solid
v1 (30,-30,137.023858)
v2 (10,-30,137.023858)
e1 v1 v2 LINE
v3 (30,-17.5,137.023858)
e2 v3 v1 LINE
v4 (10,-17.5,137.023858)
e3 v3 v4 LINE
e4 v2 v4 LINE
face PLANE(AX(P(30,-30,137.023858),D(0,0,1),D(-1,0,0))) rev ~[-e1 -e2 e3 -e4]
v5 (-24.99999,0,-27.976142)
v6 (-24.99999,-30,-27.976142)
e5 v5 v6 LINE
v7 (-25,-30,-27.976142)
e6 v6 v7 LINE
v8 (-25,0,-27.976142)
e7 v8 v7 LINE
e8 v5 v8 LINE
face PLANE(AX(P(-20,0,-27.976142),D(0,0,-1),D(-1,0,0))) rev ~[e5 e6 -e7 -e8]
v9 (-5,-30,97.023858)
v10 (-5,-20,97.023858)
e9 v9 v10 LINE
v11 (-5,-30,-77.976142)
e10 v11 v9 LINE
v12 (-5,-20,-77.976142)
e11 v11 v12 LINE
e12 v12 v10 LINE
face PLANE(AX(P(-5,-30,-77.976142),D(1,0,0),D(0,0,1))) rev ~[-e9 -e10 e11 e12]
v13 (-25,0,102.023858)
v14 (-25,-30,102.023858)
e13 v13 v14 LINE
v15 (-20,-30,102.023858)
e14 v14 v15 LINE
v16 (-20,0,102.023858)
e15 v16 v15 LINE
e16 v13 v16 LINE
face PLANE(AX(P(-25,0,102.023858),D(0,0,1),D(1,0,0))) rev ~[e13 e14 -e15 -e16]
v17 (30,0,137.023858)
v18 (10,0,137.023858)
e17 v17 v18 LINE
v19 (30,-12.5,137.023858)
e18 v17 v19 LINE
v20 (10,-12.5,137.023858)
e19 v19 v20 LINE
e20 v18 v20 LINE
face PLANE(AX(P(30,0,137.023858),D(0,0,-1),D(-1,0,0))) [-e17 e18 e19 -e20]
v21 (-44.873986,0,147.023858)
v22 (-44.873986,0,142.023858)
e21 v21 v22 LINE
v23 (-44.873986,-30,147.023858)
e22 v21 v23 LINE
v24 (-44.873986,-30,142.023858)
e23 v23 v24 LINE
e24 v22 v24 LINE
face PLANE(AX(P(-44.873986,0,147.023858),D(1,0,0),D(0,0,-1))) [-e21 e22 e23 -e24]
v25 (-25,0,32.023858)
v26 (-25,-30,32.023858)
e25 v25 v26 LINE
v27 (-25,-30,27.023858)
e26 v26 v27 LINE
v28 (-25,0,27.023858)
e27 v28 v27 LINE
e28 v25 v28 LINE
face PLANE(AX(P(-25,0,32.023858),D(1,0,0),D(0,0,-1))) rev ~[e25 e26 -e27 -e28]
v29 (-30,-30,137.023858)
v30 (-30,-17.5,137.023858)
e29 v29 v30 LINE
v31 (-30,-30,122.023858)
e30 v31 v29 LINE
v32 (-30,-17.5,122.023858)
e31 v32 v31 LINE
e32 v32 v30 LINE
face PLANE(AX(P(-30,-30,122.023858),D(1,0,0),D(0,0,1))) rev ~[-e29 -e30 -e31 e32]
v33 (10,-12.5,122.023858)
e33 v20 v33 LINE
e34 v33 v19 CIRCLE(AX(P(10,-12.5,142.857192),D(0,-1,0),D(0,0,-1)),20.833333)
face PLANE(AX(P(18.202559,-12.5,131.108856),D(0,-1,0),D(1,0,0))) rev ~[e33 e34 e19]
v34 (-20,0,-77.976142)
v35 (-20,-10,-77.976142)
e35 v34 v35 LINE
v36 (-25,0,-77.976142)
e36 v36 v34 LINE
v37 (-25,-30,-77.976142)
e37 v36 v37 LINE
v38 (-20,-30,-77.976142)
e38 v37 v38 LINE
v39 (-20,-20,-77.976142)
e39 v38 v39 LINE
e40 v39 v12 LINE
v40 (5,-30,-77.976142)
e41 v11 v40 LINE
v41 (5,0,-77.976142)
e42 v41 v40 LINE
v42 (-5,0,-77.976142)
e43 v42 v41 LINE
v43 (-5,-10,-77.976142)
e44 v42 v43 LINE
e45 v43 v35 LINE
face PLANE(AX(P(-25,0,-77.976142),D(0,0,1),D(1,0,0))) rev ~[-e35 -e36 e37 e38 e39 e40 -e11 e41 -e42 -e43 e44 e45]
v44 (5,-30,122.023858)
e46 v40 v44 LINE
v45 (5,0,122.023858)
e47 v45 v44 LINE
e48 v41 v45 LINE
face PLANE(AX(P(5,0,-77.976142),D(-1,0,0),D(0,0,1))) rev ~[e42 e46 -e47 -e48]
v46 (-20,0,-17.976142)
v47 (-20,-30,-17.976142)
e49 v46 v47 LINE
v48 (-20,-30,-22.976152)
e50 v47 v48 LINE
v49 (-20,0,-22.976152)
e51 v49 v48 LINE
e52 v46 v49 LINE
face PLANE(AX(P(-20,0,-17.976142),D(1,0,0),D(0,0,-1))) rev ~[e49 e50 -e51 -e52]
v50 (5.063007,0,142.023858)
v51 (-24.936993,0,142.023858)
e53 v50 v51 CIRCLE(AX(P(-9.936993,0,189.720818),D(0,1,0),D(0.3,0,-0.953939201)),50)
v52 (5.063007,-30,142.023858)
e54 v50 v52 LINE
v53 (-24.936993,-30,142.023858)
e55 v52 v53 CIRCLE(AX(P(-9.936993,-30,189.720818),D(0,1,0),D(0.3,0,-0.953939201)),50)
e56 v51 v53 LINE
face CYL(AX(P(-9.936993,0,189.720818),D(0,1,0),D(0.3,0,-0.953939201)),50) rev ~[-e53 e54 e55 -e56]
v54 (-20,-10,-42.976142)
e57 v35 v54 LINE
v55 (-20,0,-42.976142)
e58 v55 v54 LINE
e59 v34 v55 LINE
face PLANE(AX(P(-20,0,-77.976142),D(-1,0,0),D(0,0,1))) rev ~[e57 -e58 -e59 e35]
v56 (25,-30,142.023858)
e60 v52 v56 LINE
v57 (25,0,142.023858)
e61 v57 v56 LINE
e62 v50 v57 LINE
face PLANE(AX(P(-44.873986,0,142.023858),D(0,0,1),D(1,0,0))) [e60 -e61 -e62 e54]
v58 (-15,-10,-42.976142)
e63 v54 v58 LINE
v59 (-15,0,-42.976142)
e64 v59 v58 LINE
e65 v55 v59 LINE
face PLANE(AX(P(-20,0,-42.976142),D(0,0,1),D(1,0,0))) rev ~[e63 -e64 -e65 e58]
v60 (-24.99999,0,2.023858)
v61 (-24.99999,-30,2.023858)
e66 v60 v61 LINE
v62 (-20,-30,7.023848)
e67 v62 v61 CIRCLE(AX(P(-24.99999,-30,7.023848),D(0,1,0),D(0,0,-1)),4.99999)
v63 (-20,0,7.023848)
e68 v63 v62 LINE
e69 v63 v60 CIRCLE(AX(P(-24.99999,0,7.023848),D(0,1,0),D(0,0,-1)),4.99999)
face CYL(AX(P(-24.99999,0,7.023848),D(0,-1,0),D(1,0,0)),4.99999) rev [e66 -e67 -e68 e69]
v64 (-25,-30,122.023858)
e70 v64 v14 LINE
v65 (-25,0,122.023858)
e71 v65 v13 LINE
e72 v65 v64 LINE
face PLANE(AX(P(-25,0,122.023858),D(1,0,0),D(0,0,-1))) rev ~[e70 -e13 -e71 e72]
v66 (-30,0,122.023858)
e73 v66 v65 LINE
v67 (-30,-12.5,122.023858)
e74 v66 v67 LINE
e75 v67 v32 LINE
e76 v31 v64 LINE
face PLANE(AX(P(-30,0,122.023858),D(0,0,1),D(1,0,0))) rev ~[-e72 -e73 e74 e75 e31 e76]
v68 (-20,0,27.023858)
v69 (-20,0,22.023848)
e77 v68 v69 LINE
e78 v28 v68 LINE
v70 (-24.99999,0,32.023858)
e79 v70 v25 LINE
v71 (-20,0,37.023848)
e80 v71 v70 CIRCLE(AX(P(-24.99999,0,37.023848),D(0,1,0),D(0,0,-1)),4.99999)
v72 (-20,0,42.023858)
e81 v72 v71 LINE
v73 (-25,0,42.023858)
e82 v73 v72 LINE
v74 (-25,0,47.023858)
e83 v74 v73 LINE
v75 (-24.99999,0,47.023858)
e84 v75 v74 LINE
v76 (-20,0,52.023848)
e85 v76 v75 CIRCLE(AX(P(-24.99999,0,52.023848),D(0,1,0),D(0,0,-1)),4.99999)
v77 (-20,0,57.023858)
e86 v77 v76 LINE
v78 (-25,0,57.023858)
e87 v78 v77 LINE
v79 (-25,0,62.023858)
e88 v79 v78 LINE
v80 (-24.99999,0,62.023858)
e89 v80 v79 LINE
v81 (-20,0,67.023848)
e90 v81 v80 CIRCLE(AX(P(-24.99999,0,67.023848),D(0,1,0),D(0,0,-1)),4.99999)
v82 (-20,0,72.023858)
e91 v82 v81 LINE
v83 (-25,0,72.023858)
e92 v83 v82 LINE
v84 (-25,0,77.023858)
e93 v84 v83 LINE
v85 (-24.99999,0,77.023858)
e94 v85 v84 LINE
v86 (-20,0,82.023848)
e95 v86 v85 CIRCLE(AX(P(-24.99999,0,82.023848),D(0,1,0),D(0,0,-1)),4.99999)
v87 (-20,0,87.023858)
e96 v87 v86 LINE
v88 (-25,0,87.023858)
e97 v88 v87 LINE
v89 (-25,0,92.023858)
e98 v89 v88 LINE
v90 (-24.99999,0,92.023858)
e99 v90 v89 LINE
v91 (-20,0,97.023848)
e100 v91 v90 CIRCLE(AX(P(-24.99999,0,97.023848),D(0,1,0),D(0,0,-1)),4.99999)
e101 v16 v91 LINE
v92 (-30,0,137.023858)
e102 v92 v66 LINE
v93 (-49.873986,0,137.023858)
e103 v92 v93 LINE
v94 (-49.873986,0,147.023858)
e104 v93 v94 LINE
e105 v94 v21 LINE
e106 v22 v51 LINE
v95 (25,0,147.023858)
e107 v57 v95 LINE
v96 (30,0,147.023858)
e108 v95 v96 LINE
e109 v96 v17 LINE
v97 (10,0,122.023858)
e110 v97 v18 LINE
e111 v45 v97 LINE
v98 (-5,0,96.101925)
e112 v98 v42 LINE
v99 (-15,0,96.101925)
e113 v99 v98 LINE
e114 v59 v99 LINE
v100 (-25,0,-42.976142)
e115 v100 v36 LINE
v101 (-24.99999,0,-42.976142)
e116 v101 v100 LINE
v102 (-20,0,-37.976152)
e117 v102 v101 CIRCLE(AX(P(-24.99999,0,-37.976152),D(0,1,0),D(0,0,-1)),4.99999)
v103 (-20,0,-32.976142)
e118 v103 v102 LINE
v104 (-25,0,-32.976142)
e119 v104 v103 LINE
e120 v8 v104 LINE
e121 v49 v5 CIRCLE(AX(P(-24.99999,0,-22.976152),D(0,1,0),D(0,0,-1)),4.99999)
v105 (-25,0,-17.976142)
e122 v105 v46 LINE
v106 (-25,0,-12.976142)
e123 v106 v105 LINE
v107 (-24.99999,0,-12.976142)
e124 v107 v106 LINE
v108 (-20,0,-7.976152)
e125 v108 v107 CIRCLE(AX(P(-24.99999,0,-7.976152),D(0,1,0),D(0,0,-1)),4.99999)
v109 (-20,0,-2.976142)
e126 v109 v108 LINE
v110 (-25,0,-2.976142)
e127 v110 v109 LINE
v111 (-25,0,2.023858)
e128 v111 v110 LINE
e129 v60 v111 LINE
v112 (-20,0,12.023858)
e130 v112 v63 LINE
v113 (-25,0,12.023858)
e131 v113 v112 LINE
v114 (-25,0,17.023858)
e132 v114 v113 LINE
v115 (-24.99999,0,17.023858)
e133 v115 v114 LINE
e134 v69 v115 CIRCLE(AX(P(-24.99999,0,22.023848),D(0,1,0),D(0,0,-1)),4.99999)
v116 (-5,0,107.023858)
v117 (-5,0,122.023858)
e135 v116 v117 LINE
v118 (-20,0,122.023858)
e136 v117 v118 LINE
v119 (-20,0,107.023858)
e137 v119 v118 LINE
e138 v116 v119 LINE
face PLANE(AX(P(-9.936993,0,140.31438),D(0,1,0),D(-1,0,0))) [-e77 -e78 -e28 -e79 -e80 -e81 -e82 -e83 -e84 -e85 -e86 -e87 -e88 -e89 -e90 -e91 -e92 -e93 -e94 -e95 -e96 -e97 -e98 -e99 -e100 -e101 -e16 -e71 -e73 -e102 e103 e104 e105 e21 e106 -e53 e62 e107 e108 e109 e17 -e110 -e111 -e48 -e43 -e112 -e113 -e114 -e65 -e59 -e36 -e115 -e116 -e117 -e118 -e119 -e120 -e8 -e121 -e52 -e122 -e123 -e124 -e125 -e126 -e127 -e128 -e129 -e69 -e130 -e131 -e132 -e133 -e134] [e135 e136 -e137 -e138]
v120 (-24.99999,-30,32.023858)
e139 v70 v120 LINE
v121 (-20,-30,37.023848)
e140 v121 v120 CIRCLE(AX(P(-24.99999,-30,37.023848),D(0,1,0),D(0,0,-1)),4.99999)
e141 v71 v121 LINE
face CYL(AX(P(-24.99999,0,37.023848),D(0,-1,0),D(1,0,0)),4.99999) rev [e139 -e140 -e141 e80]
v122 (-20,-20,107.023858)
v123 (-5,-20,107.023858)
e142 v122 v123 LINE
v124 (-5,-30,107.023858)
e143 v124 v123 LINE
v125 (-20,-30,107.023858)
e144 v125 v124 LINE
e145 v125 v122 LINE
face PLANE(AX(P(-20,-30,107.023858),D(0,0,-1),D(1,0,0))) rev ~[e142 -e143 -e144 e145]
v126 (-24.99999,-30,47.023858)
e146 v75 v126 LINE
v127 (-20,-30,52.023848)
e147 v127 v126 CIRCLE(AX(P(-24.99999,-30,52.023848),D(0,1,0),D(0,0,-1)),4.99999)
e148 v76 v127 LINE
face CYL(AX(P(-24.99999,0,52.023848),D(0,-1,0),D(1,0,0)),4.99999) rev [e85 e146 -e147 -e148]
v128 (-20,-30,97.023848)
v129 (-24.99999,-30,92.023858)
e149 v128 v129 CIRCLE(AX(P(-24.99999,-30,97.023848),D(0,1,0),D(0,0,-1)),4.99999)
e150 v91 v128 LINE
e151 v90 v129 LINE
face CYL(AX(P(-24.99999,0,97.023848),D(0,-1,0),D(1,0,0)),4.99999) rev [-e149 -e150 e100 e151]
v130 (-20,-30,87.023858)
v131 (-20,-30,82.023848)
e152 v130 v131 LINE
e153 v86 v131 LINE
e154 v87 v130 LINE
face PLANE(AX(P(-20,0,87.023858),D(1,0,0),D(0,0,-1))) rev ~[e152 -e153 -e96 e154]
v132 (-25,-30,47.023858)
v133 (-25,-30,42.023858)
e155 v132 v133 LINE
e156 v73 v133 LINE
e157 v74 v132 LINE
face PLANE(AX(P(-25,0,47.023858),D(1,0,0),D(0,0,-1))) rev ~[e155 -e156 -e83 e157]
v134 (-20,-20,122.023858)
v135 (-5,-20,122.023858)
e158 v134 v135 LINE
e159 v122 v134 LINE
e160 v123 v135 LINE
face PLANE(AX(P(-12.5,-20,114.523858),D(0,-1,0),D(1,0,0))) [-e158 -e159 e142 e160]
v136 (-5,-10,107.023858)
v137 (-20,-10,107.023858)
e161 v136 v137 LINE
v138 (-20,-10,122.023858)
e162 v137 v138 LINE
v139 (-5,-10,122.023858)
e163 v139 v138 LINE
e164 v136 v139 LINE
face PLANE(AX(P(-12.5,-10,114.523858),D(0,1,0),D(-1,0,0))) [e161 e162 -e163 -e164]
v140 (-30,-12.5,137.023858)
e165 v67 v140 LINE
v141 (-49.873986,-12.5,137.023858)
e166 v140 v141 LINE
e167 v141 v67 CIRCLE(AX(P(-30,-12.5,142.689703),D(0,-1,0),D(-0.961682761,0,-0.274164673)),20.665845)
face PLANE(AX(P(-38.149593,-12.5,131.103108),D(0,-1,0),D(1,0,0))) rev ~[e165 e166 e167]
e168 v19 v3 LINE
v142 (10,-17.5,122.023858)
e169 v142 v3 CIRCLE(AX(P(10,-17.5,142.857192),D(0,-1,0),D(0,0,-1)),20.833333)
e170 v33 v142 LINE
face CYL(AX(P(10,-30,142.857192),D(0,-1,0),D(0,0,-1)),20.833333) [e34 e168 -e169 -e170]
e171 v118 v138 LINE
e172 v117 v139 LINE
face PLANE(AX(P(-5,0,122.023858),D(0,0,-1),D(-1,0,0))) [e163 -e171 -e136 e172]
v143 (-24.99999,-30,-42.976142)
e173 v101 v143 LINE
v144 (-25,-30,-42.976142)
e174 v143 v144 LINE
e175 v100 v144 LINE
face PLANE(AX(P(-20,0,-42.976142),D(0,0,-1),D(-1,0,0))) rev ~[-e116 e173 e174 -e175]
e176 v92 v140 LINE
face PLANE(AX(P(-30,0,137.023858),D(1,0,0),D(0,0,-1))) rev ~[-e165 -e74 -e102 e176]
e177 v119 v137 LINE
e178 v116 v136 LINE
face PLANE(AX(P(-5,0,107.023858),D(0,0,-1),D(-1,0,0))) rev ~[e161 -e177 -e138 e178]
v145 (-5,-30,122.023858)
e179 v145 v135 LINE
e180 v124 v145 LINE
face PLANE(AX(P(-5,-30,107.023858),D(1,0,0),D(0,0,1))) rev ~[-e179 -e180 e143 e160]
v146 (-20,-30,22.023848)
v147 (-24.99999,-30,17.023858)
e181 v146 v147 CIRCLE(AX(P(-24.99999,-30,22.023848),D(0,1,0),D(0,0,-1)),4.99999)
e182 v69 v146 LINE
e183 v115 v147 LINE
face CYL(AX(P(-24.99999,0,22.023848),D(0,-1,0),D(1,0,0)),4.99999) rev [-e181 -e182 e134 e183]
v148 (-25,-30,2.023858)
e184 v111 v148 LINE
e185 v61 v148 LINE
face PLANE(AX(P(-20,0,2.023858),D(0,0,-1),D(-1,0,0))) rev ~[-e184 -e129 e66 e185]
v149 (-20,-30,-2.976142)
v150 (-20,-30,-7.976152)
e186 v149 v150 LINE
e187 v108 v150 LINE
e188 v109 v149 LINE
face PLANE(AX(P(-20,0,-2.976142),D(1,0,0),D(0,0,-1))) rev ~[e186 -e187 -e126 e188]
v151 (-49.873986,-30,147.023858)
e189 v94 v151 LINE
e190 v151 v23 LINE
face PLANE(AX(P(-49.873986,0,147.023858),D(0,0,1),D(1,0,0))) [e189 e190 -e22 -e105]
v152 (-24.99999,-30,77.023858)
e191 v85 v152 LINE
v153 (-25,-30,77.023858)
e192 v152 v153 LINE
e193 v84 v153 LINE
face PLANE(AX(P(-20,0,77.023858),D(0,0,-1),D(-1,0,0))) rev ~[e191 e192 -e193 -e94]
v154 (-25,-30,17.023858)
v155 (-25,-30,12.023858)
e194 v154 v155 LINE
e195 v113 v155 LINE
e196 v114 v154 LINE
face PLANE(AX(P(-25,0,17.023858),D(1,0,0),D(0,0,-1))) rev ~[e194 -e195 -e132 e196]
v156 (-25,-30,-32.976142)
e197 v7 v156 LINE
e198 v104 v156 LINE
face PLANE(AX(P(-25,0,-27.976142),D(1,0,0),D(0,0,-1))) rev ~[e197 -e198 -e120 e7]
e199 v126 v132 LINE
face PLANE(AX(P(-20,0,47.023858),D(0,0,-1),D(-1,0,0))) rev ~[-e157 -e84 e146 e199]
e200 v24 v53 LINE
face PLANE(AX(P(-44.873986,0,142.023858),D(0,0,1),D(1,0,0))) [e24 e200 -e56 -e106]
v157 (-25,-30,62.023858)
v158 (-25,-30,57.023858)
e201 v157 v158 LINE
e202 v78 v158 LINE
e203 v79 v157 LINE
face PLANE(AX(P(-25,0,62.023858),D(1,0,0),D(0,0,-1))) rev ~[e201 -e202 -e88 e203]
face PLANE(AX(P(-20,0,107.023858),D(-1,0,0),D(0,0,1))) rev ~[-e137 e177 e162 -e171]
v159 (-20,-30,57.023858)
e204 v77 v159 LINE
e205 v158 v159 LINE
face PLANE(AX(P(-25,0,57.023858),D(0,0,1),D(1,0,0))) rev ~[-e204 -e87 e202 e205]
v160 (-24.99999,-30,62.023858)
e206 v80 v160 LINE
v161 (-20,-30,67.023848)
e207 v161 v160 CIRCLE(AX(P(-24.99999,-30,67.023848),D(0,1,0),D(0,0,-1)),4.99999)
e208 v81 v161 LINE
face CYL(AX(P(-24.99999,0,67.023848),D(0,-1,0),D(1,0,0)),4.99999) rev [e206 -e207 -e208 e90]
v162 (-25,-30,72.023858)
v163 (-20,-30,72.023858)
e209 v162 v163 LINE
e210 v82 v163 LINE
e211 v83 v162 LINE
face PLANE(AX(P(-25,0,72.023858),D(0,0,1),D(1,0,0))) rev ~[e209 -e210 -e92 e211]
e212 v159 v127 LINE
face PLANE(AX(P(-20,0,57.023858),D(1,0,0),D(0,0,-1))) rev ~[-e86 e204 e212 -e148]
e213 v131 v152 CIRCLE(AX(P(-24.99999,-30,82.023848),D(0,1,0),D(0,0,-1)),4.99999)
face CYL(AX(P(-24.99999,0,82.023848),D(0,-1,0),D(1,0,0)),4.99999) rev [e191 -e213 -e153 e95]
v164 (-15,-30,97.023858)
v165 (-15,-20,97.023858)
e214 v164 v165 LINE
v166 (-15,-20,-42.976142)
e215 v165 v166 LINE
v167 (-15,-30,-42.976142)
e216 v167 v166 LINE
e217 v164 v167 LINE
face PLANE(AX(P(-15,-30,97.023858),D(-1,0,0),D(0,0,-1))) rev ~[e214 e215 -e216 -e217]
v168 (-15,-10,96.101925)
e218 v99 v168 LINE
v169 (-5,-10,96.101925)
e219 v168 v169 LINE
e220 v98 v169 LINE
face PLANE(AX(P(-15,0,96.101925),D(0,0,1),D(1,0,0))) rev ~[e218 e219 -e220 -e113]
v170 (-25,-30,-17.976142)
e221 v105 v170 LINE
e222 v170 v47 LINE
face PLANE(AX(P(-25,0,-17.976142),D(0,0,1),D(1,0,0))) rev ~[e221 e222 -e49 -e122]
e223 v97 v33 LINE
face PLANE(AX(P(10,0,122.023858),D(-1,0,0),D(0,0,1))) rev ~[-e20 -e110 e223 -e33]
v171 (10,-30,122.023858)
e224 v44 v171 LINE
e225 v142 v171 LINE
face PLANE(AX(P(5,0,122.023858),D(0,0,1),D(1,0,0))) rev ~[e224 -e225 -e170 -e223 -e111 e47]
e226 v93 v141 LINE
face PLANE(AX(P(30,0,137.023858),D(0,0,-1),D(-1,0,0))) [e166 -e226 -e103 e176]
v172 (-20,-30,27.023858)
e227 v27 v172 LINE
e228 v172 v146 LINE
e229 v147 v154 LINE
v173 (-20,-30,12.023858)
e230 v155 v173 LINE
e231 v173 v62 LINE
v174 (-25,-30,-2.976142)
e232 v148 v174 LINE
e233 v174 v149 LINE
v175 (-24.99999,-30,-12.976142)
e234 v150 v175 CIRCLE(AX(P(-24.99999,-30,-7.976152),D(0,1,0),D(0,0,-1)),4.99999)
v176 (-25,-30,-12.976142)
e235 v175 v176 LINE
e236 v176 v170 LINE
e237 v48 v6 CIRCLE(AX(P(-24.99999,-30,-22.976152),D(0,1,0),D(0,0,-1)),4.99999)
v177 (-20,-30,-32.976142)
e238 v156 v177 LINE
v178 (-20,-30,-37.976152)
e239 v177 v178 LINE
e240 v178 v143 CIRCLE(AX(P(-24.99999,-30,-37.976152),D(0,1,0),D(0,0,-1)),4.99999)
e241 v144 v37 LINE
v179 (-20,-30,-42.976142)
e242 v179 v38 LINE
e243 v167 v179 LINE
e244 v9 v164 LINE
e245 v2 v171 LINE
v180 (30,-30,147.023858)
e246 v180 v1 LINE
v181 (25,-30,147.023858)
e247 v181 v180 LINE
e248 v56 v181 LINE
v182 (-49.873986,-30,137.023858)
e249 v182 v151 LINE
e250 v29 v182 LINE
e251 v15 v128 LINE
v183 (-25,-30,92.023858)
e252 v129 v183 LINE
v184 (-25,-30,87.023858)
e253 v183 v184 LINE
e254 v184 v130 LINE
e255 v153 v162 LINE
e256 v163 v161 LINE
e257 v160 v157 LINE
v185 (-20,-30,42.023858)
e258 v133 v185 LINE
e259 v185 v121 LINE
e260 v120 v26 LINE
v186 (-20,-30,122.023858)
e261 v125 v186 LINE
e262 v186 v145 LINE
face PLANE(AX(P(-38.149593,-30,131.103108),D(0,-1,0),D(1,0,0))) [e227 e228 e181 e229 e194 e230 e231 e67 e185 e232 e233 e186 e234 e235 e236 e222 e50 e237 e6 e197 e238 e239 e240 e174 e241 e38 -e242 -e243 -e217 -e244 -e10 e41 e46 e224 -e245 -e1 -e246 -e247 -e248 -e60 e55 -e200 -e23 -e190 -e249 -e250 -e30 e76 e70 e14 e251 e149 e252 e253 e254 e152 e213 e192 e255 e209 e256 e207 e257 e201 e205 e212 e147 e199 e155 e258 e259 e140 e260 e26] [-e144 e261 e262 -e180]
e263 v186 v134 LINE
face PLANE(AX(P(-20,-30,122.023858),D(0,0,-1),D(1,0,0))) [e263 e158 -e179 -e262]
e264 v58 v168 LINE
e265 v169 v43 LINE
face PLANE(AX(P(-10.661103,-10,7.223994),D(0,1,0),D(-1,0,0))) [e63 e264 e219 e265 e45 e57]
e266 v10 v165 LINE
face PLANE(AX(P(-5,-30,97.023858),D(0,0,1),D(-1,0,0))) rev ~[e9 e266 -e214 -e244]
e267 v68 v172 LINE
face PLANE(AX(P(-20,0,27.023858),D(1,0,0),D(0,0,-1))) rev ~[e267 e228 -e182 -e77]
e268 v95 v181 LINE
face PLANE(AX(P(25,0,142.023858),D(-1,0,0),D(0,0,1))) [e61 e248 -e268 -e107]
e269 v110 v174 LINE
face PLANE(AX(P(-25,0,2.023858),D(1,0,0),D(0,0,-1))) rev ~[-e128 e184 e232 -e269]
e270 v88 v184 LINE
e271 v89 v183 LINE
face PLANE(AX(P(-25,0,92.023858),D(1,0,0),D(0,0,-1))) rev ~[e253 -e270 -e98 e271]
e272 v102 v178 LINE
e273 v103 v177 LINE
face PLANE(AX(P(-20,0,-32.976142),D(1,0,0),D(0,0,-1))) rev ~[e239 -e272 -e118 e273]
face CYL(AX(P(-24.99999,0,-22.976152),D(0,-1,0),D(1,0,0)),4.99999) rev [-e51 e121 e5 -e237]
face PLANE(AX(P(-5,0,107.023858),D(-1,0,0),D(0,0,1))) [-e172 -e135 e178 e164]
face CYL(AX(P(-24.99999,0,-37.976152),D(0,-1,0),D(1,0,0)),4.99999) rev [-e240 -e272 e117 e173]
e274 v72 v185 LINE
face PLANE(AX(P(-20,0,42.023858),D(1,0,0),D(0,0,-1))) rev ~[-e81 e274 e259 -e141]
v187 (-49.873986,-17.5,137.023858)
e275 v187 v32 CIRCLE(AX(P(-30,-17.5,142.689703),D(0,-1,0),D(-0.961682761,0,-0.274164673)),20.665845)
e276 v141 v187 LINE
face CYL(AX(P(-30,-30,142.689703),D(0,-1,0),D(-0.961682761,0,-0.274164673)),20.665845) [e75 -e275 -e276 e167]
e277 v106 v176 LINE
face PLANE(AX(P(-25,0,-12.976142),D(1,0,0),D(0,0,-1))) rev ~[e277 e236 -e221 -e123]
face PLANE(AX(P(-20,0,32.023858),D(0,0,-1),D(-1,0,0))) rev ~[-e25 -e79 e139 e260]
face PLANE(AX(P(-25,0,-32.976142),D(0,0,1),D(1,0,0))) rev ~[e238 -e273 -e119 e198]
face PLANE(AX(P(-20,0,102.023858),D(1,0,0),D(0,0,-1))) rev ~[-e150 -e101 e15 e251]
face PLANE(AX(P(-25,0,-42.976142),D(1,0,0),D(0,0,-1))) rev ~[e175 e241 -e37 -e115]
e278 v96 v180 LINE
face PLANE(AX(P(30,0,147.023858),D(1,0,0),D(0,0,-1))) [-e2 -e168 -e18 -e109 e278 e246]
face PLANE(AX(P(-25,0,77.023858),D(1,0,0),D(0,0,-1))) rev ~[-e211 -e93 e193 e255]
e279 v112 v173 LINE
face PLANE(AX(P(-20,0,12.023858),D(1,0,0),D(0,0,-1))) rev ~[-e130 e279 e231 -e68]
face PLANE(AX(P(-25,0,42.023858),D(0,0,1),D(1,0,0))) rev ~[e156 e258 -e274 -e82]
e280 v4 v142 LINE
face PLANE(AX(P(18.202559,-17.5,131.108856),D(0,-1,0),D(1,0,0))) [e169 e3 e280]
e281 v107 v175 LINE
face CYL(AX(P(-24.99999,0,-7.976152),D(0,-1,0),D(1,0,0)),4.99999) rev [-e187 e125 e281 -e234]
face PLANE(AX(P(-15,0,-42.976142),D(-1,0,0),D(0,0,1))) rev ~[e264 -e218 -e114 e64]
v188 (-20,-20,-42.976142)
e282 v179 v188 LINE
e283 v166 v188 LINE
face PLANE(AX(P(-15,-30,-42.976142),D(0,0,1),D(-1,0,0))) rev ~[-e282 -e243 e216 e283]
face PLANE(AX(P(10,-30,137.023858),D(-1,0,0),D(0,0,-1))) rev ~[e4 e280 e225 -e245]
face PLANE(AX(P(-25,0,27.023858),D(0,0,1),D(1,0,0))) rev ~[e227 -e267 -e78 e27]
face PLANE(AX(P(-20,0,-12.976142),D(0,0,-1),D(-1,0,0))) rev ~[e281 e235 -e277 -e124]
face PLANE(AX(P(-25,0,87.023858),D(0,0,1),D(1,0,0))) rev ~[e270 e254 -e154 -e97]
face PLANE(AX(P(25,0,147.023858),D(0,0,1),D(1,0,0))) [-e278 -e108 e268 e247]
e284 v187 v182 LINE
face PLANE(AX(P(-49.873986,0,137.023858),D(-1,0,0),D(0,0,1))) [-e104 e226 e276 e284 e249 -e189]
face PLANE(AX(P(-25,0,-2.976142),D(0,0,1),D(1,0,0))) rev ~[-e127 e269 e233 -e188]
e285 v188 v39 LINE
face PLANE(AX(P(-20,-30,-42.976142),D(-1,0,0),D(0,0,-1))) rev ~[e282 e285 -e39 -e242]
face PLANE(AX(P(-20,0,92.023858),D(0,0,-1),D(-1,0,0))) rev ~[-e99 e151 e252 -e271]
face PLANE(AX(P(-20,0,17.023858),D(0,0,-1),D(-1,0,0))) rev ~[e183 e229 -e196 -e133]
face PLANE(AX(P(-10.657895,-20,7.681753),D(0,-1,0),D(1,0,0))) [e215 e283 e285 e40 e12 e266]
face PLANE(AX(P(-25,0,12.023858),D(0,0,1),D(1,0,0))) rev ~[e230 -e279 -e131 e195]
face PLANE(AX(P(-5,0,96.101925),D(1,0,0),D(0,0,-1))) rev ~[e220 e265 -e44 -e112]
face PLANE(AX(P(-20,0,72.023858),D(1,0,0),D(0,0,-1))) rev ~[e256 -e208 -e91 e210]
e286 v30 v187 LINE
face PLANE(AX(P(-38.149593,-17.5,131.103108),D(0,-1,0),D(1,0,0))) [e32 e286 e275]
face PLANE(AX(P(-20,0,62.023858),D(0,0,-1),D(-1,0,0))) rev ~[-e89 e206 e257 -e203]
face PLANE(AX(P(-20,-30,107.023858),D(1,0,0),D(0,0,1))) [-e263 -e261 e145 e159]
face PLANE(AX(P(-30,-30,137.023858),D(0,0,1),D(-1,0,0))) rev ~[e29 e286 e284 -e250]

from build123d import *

# Parameters (mm, degrees)
F1_DEPTH  = 30
F2_R      = 4.99999
F3_W      = 15
F3_H      = 15
F4_DEPTH  = 10
F5_W      = 15
F5_H      = 15
F6_DEPTH  = 10
F8_DEPTH  = 30
F10_DEPTH = 17.5
F12_DEPTH = 12.5
F14_DEPTH = 30


# Not quite as in the source:
# - a fillet or chamfer is up to 0.001 mm smaller than in the source, because OpenCascade refuses the exact size


with BuildPart() as f1:
    # F0 (on Front) → F1 (new body)
    with BuildSketch(Plane.XZ):
        Polygon((-25, -42.9761418055), (-25, -77.9761418055), (5, -77.9761418055), (5, 122.0238581945), (10, 122.0238581945), (10, 137.0238581945), (-30, 137.0238581945), (-30, 122.0238581945), (-25, 122.0238581945), (-25, 102.0238581945), (-20, 102.0238581945), (-20, 92.0238581945), (-25, 92.0238581945), (-25, 87.0238581945), (-20, 87.0238581945), (-20, 77.0238581945), (-25, 77.0238581945), (-25, 72.0238581945), (-20, 72.0238581945), (-20, 62.0238581945), (-25, 62.0238581945), (-25, 57.0238581945), (-20, 57.0238581945), (-20, 47.0238581945), (-25, 47.0238581945), (-25, 42.0238581945), (-20, 42.0238581945), (-20, 32.0238581945), (-25, 32.0238581945), (-25, 27.0238581945), (-20, 27.0238581945), (-20, 17.0238581945), (-25, 17.0238581945), (-25, 12.0238581945), (-20, 12.0238581945), (-20, 2.0238581945), (-25, 2.0238581945), (-25, -2.9761418055), (-20, -2.9761418055), (-20, -12.9761418055), (-25, -12.9761418055), (-25, -17.9761418055), (-20, -17.9761418055), (-20, -27.9761418055), (-25, -27.9761418055), (-25, -32.9761418055), (-20, -32.9761418055), (-20, -42.9761418055), align=None)
    extrude(amount=F1_DEPTH)

    # F2 (radius 5 in the source; OpenCascade refuses exactly that, so slightly less here)
    f2_edges = [f1.edges().sort_by_distance(p)[0] for p in [
        (-20, -15, 92.023858),
        (-20, -15, 77.023858),
        (-20, -15, 62.023858),
        (-20, -15, 47.023858),
        (-20, -15, 32.023858),
        (-20, -15, 17.023858),
        (-20, -15, 2.023858),
        (-20, -15, -12.976142),
        (-20, -15, -27.976142),
        (-20, -15, -42.976142),
    ]]
    fillet(f2_edges, radius=F2_R)

    # F3 (on face) → F4 (cut)
    with BuildSketch(Plane.XZ.offset(30)):
        Polygon((-15, -42.9761418055), (-20, -42.9761418055), (-20, -77.9761418055), (-5, -77.9761418055), (-5, 97.0238581945), (-15, 97.0238581945), align=None)
        with Locations((-12.5, 114.5238581945)):
            Rectangle(F3_W, F3_H)
    extrude(amount=-F4_DEPTH, mode=Mode.SUBTRACT)

    # F5 (on face) → F6 (cut)
    with BuildSketch(Plane(origin=(0, 0, 0), x_dir=(-1, 0, 0), z_dir=(0, 1, 0))):
        Polygon((20, -77.9761418055), (20, -42.9761418055), (15, -42.9761418055), (15, 96.101924777), (5, 96.101924777), (5, -77.9761418055), align=None)
        with Locations((12.5, 114.5238581945)):
            Rectangle(F5_W, F5_H)
    extrude(amount=-F6_DEPTH, mode=Mode.SUBTRACT)

    # F7 (on face) → F8 (join)
    with BuildSketch(Plane(origin=(0, 0, 0), x_dir=(-1, 0, 0), z_dir=(0, 1, 0))):
        Polygon((-30, 147.0238581945), (-30, 137.0238581945), (49.8739863932, 137.0238581945), (49.8739863932, 147.0238581945), (44.8739863932, 147.0238581945), (44.8739863932, 142.0238581945), (-25, 142.0238581945), (-25, 147.0238581945), align=None)
    extrude(amount=-F8_DEPTH)

    # F9 (on face) → F10 (join)
    with BuildSketch(Plane.XZ.offset(30)):
        with BuildLine():
            Line((-30, 137.0238581945), (-49.8739863932, 137.0238581945))
            ThreePointArc((-49.8739863932, 137.0238581945), (-42.4496519545, 126.1947551301), (-30, 122.0238581945))
            Line((-30, 122.0238581945), (-30, 137.0238581945))
        make_face()
        with BuildLine():
            ThreePointArc((10, 122.0238581945), (22.5, 126.1905248612), (30, 137.0238581945))
            Line((30, 137.0238581945), (10, 137.0238581945))
            Line((10, 137.0238581945), (10, 122.0238581945))
        make_face()
    extrude(amount=-F10_DEPTH)

    # F11 (on face) → F12 (cut)
    with BuildSketch(Plane.XZ.offset(30)):
        with BuildLine():
            Line((-30, 137.0238581945), (-49.8739863932, 137.0238581945))
            ThreePointArc((-49.8739863932, 137.0238581945), (-42.4496519545, 126.1947551301), (-30, 122.0238581945))
            Line((-30, 122.0238581945), (-30, 137.0238581945))
        make_face()
        with BuildLine():
            Line((10, 137.0238581945), (10, 122.0238581945))
            ThreePointArc((10, 122.0238581945), (22.5, 126.1905248612), (30, 137.0238581945))
            Line((30, 137.0238581945), (10, 137.0238581945))
        make_face()
    extrude(amount=-F12_DEPTH, mode=Mode.SUBTRACT)

    # F13 (on face) → F14 (cut)
    with BuildSketch(Plane(origin=(0, 0, 0), x_dir=(-1, 0, 0), z_dir=(0, 1, 0))):
        with BuildLine():
            Line((24.9369931966, 142.0238581945), (9.9369931966, 142.0238581945))
            Line((9.9369931966, 142.0238581945), (-5.0630068034, 142.0238581945))
            ThreePointArc((-5.0630068034, 142.0238581945), (9.9369931966, 139.7208182654), (24.9369931966, 142.0238581945))
        make_face()
    extrude(amount=-F14_DEPTH, mode=Mode.SUBTRACT)


solid = f1.part
